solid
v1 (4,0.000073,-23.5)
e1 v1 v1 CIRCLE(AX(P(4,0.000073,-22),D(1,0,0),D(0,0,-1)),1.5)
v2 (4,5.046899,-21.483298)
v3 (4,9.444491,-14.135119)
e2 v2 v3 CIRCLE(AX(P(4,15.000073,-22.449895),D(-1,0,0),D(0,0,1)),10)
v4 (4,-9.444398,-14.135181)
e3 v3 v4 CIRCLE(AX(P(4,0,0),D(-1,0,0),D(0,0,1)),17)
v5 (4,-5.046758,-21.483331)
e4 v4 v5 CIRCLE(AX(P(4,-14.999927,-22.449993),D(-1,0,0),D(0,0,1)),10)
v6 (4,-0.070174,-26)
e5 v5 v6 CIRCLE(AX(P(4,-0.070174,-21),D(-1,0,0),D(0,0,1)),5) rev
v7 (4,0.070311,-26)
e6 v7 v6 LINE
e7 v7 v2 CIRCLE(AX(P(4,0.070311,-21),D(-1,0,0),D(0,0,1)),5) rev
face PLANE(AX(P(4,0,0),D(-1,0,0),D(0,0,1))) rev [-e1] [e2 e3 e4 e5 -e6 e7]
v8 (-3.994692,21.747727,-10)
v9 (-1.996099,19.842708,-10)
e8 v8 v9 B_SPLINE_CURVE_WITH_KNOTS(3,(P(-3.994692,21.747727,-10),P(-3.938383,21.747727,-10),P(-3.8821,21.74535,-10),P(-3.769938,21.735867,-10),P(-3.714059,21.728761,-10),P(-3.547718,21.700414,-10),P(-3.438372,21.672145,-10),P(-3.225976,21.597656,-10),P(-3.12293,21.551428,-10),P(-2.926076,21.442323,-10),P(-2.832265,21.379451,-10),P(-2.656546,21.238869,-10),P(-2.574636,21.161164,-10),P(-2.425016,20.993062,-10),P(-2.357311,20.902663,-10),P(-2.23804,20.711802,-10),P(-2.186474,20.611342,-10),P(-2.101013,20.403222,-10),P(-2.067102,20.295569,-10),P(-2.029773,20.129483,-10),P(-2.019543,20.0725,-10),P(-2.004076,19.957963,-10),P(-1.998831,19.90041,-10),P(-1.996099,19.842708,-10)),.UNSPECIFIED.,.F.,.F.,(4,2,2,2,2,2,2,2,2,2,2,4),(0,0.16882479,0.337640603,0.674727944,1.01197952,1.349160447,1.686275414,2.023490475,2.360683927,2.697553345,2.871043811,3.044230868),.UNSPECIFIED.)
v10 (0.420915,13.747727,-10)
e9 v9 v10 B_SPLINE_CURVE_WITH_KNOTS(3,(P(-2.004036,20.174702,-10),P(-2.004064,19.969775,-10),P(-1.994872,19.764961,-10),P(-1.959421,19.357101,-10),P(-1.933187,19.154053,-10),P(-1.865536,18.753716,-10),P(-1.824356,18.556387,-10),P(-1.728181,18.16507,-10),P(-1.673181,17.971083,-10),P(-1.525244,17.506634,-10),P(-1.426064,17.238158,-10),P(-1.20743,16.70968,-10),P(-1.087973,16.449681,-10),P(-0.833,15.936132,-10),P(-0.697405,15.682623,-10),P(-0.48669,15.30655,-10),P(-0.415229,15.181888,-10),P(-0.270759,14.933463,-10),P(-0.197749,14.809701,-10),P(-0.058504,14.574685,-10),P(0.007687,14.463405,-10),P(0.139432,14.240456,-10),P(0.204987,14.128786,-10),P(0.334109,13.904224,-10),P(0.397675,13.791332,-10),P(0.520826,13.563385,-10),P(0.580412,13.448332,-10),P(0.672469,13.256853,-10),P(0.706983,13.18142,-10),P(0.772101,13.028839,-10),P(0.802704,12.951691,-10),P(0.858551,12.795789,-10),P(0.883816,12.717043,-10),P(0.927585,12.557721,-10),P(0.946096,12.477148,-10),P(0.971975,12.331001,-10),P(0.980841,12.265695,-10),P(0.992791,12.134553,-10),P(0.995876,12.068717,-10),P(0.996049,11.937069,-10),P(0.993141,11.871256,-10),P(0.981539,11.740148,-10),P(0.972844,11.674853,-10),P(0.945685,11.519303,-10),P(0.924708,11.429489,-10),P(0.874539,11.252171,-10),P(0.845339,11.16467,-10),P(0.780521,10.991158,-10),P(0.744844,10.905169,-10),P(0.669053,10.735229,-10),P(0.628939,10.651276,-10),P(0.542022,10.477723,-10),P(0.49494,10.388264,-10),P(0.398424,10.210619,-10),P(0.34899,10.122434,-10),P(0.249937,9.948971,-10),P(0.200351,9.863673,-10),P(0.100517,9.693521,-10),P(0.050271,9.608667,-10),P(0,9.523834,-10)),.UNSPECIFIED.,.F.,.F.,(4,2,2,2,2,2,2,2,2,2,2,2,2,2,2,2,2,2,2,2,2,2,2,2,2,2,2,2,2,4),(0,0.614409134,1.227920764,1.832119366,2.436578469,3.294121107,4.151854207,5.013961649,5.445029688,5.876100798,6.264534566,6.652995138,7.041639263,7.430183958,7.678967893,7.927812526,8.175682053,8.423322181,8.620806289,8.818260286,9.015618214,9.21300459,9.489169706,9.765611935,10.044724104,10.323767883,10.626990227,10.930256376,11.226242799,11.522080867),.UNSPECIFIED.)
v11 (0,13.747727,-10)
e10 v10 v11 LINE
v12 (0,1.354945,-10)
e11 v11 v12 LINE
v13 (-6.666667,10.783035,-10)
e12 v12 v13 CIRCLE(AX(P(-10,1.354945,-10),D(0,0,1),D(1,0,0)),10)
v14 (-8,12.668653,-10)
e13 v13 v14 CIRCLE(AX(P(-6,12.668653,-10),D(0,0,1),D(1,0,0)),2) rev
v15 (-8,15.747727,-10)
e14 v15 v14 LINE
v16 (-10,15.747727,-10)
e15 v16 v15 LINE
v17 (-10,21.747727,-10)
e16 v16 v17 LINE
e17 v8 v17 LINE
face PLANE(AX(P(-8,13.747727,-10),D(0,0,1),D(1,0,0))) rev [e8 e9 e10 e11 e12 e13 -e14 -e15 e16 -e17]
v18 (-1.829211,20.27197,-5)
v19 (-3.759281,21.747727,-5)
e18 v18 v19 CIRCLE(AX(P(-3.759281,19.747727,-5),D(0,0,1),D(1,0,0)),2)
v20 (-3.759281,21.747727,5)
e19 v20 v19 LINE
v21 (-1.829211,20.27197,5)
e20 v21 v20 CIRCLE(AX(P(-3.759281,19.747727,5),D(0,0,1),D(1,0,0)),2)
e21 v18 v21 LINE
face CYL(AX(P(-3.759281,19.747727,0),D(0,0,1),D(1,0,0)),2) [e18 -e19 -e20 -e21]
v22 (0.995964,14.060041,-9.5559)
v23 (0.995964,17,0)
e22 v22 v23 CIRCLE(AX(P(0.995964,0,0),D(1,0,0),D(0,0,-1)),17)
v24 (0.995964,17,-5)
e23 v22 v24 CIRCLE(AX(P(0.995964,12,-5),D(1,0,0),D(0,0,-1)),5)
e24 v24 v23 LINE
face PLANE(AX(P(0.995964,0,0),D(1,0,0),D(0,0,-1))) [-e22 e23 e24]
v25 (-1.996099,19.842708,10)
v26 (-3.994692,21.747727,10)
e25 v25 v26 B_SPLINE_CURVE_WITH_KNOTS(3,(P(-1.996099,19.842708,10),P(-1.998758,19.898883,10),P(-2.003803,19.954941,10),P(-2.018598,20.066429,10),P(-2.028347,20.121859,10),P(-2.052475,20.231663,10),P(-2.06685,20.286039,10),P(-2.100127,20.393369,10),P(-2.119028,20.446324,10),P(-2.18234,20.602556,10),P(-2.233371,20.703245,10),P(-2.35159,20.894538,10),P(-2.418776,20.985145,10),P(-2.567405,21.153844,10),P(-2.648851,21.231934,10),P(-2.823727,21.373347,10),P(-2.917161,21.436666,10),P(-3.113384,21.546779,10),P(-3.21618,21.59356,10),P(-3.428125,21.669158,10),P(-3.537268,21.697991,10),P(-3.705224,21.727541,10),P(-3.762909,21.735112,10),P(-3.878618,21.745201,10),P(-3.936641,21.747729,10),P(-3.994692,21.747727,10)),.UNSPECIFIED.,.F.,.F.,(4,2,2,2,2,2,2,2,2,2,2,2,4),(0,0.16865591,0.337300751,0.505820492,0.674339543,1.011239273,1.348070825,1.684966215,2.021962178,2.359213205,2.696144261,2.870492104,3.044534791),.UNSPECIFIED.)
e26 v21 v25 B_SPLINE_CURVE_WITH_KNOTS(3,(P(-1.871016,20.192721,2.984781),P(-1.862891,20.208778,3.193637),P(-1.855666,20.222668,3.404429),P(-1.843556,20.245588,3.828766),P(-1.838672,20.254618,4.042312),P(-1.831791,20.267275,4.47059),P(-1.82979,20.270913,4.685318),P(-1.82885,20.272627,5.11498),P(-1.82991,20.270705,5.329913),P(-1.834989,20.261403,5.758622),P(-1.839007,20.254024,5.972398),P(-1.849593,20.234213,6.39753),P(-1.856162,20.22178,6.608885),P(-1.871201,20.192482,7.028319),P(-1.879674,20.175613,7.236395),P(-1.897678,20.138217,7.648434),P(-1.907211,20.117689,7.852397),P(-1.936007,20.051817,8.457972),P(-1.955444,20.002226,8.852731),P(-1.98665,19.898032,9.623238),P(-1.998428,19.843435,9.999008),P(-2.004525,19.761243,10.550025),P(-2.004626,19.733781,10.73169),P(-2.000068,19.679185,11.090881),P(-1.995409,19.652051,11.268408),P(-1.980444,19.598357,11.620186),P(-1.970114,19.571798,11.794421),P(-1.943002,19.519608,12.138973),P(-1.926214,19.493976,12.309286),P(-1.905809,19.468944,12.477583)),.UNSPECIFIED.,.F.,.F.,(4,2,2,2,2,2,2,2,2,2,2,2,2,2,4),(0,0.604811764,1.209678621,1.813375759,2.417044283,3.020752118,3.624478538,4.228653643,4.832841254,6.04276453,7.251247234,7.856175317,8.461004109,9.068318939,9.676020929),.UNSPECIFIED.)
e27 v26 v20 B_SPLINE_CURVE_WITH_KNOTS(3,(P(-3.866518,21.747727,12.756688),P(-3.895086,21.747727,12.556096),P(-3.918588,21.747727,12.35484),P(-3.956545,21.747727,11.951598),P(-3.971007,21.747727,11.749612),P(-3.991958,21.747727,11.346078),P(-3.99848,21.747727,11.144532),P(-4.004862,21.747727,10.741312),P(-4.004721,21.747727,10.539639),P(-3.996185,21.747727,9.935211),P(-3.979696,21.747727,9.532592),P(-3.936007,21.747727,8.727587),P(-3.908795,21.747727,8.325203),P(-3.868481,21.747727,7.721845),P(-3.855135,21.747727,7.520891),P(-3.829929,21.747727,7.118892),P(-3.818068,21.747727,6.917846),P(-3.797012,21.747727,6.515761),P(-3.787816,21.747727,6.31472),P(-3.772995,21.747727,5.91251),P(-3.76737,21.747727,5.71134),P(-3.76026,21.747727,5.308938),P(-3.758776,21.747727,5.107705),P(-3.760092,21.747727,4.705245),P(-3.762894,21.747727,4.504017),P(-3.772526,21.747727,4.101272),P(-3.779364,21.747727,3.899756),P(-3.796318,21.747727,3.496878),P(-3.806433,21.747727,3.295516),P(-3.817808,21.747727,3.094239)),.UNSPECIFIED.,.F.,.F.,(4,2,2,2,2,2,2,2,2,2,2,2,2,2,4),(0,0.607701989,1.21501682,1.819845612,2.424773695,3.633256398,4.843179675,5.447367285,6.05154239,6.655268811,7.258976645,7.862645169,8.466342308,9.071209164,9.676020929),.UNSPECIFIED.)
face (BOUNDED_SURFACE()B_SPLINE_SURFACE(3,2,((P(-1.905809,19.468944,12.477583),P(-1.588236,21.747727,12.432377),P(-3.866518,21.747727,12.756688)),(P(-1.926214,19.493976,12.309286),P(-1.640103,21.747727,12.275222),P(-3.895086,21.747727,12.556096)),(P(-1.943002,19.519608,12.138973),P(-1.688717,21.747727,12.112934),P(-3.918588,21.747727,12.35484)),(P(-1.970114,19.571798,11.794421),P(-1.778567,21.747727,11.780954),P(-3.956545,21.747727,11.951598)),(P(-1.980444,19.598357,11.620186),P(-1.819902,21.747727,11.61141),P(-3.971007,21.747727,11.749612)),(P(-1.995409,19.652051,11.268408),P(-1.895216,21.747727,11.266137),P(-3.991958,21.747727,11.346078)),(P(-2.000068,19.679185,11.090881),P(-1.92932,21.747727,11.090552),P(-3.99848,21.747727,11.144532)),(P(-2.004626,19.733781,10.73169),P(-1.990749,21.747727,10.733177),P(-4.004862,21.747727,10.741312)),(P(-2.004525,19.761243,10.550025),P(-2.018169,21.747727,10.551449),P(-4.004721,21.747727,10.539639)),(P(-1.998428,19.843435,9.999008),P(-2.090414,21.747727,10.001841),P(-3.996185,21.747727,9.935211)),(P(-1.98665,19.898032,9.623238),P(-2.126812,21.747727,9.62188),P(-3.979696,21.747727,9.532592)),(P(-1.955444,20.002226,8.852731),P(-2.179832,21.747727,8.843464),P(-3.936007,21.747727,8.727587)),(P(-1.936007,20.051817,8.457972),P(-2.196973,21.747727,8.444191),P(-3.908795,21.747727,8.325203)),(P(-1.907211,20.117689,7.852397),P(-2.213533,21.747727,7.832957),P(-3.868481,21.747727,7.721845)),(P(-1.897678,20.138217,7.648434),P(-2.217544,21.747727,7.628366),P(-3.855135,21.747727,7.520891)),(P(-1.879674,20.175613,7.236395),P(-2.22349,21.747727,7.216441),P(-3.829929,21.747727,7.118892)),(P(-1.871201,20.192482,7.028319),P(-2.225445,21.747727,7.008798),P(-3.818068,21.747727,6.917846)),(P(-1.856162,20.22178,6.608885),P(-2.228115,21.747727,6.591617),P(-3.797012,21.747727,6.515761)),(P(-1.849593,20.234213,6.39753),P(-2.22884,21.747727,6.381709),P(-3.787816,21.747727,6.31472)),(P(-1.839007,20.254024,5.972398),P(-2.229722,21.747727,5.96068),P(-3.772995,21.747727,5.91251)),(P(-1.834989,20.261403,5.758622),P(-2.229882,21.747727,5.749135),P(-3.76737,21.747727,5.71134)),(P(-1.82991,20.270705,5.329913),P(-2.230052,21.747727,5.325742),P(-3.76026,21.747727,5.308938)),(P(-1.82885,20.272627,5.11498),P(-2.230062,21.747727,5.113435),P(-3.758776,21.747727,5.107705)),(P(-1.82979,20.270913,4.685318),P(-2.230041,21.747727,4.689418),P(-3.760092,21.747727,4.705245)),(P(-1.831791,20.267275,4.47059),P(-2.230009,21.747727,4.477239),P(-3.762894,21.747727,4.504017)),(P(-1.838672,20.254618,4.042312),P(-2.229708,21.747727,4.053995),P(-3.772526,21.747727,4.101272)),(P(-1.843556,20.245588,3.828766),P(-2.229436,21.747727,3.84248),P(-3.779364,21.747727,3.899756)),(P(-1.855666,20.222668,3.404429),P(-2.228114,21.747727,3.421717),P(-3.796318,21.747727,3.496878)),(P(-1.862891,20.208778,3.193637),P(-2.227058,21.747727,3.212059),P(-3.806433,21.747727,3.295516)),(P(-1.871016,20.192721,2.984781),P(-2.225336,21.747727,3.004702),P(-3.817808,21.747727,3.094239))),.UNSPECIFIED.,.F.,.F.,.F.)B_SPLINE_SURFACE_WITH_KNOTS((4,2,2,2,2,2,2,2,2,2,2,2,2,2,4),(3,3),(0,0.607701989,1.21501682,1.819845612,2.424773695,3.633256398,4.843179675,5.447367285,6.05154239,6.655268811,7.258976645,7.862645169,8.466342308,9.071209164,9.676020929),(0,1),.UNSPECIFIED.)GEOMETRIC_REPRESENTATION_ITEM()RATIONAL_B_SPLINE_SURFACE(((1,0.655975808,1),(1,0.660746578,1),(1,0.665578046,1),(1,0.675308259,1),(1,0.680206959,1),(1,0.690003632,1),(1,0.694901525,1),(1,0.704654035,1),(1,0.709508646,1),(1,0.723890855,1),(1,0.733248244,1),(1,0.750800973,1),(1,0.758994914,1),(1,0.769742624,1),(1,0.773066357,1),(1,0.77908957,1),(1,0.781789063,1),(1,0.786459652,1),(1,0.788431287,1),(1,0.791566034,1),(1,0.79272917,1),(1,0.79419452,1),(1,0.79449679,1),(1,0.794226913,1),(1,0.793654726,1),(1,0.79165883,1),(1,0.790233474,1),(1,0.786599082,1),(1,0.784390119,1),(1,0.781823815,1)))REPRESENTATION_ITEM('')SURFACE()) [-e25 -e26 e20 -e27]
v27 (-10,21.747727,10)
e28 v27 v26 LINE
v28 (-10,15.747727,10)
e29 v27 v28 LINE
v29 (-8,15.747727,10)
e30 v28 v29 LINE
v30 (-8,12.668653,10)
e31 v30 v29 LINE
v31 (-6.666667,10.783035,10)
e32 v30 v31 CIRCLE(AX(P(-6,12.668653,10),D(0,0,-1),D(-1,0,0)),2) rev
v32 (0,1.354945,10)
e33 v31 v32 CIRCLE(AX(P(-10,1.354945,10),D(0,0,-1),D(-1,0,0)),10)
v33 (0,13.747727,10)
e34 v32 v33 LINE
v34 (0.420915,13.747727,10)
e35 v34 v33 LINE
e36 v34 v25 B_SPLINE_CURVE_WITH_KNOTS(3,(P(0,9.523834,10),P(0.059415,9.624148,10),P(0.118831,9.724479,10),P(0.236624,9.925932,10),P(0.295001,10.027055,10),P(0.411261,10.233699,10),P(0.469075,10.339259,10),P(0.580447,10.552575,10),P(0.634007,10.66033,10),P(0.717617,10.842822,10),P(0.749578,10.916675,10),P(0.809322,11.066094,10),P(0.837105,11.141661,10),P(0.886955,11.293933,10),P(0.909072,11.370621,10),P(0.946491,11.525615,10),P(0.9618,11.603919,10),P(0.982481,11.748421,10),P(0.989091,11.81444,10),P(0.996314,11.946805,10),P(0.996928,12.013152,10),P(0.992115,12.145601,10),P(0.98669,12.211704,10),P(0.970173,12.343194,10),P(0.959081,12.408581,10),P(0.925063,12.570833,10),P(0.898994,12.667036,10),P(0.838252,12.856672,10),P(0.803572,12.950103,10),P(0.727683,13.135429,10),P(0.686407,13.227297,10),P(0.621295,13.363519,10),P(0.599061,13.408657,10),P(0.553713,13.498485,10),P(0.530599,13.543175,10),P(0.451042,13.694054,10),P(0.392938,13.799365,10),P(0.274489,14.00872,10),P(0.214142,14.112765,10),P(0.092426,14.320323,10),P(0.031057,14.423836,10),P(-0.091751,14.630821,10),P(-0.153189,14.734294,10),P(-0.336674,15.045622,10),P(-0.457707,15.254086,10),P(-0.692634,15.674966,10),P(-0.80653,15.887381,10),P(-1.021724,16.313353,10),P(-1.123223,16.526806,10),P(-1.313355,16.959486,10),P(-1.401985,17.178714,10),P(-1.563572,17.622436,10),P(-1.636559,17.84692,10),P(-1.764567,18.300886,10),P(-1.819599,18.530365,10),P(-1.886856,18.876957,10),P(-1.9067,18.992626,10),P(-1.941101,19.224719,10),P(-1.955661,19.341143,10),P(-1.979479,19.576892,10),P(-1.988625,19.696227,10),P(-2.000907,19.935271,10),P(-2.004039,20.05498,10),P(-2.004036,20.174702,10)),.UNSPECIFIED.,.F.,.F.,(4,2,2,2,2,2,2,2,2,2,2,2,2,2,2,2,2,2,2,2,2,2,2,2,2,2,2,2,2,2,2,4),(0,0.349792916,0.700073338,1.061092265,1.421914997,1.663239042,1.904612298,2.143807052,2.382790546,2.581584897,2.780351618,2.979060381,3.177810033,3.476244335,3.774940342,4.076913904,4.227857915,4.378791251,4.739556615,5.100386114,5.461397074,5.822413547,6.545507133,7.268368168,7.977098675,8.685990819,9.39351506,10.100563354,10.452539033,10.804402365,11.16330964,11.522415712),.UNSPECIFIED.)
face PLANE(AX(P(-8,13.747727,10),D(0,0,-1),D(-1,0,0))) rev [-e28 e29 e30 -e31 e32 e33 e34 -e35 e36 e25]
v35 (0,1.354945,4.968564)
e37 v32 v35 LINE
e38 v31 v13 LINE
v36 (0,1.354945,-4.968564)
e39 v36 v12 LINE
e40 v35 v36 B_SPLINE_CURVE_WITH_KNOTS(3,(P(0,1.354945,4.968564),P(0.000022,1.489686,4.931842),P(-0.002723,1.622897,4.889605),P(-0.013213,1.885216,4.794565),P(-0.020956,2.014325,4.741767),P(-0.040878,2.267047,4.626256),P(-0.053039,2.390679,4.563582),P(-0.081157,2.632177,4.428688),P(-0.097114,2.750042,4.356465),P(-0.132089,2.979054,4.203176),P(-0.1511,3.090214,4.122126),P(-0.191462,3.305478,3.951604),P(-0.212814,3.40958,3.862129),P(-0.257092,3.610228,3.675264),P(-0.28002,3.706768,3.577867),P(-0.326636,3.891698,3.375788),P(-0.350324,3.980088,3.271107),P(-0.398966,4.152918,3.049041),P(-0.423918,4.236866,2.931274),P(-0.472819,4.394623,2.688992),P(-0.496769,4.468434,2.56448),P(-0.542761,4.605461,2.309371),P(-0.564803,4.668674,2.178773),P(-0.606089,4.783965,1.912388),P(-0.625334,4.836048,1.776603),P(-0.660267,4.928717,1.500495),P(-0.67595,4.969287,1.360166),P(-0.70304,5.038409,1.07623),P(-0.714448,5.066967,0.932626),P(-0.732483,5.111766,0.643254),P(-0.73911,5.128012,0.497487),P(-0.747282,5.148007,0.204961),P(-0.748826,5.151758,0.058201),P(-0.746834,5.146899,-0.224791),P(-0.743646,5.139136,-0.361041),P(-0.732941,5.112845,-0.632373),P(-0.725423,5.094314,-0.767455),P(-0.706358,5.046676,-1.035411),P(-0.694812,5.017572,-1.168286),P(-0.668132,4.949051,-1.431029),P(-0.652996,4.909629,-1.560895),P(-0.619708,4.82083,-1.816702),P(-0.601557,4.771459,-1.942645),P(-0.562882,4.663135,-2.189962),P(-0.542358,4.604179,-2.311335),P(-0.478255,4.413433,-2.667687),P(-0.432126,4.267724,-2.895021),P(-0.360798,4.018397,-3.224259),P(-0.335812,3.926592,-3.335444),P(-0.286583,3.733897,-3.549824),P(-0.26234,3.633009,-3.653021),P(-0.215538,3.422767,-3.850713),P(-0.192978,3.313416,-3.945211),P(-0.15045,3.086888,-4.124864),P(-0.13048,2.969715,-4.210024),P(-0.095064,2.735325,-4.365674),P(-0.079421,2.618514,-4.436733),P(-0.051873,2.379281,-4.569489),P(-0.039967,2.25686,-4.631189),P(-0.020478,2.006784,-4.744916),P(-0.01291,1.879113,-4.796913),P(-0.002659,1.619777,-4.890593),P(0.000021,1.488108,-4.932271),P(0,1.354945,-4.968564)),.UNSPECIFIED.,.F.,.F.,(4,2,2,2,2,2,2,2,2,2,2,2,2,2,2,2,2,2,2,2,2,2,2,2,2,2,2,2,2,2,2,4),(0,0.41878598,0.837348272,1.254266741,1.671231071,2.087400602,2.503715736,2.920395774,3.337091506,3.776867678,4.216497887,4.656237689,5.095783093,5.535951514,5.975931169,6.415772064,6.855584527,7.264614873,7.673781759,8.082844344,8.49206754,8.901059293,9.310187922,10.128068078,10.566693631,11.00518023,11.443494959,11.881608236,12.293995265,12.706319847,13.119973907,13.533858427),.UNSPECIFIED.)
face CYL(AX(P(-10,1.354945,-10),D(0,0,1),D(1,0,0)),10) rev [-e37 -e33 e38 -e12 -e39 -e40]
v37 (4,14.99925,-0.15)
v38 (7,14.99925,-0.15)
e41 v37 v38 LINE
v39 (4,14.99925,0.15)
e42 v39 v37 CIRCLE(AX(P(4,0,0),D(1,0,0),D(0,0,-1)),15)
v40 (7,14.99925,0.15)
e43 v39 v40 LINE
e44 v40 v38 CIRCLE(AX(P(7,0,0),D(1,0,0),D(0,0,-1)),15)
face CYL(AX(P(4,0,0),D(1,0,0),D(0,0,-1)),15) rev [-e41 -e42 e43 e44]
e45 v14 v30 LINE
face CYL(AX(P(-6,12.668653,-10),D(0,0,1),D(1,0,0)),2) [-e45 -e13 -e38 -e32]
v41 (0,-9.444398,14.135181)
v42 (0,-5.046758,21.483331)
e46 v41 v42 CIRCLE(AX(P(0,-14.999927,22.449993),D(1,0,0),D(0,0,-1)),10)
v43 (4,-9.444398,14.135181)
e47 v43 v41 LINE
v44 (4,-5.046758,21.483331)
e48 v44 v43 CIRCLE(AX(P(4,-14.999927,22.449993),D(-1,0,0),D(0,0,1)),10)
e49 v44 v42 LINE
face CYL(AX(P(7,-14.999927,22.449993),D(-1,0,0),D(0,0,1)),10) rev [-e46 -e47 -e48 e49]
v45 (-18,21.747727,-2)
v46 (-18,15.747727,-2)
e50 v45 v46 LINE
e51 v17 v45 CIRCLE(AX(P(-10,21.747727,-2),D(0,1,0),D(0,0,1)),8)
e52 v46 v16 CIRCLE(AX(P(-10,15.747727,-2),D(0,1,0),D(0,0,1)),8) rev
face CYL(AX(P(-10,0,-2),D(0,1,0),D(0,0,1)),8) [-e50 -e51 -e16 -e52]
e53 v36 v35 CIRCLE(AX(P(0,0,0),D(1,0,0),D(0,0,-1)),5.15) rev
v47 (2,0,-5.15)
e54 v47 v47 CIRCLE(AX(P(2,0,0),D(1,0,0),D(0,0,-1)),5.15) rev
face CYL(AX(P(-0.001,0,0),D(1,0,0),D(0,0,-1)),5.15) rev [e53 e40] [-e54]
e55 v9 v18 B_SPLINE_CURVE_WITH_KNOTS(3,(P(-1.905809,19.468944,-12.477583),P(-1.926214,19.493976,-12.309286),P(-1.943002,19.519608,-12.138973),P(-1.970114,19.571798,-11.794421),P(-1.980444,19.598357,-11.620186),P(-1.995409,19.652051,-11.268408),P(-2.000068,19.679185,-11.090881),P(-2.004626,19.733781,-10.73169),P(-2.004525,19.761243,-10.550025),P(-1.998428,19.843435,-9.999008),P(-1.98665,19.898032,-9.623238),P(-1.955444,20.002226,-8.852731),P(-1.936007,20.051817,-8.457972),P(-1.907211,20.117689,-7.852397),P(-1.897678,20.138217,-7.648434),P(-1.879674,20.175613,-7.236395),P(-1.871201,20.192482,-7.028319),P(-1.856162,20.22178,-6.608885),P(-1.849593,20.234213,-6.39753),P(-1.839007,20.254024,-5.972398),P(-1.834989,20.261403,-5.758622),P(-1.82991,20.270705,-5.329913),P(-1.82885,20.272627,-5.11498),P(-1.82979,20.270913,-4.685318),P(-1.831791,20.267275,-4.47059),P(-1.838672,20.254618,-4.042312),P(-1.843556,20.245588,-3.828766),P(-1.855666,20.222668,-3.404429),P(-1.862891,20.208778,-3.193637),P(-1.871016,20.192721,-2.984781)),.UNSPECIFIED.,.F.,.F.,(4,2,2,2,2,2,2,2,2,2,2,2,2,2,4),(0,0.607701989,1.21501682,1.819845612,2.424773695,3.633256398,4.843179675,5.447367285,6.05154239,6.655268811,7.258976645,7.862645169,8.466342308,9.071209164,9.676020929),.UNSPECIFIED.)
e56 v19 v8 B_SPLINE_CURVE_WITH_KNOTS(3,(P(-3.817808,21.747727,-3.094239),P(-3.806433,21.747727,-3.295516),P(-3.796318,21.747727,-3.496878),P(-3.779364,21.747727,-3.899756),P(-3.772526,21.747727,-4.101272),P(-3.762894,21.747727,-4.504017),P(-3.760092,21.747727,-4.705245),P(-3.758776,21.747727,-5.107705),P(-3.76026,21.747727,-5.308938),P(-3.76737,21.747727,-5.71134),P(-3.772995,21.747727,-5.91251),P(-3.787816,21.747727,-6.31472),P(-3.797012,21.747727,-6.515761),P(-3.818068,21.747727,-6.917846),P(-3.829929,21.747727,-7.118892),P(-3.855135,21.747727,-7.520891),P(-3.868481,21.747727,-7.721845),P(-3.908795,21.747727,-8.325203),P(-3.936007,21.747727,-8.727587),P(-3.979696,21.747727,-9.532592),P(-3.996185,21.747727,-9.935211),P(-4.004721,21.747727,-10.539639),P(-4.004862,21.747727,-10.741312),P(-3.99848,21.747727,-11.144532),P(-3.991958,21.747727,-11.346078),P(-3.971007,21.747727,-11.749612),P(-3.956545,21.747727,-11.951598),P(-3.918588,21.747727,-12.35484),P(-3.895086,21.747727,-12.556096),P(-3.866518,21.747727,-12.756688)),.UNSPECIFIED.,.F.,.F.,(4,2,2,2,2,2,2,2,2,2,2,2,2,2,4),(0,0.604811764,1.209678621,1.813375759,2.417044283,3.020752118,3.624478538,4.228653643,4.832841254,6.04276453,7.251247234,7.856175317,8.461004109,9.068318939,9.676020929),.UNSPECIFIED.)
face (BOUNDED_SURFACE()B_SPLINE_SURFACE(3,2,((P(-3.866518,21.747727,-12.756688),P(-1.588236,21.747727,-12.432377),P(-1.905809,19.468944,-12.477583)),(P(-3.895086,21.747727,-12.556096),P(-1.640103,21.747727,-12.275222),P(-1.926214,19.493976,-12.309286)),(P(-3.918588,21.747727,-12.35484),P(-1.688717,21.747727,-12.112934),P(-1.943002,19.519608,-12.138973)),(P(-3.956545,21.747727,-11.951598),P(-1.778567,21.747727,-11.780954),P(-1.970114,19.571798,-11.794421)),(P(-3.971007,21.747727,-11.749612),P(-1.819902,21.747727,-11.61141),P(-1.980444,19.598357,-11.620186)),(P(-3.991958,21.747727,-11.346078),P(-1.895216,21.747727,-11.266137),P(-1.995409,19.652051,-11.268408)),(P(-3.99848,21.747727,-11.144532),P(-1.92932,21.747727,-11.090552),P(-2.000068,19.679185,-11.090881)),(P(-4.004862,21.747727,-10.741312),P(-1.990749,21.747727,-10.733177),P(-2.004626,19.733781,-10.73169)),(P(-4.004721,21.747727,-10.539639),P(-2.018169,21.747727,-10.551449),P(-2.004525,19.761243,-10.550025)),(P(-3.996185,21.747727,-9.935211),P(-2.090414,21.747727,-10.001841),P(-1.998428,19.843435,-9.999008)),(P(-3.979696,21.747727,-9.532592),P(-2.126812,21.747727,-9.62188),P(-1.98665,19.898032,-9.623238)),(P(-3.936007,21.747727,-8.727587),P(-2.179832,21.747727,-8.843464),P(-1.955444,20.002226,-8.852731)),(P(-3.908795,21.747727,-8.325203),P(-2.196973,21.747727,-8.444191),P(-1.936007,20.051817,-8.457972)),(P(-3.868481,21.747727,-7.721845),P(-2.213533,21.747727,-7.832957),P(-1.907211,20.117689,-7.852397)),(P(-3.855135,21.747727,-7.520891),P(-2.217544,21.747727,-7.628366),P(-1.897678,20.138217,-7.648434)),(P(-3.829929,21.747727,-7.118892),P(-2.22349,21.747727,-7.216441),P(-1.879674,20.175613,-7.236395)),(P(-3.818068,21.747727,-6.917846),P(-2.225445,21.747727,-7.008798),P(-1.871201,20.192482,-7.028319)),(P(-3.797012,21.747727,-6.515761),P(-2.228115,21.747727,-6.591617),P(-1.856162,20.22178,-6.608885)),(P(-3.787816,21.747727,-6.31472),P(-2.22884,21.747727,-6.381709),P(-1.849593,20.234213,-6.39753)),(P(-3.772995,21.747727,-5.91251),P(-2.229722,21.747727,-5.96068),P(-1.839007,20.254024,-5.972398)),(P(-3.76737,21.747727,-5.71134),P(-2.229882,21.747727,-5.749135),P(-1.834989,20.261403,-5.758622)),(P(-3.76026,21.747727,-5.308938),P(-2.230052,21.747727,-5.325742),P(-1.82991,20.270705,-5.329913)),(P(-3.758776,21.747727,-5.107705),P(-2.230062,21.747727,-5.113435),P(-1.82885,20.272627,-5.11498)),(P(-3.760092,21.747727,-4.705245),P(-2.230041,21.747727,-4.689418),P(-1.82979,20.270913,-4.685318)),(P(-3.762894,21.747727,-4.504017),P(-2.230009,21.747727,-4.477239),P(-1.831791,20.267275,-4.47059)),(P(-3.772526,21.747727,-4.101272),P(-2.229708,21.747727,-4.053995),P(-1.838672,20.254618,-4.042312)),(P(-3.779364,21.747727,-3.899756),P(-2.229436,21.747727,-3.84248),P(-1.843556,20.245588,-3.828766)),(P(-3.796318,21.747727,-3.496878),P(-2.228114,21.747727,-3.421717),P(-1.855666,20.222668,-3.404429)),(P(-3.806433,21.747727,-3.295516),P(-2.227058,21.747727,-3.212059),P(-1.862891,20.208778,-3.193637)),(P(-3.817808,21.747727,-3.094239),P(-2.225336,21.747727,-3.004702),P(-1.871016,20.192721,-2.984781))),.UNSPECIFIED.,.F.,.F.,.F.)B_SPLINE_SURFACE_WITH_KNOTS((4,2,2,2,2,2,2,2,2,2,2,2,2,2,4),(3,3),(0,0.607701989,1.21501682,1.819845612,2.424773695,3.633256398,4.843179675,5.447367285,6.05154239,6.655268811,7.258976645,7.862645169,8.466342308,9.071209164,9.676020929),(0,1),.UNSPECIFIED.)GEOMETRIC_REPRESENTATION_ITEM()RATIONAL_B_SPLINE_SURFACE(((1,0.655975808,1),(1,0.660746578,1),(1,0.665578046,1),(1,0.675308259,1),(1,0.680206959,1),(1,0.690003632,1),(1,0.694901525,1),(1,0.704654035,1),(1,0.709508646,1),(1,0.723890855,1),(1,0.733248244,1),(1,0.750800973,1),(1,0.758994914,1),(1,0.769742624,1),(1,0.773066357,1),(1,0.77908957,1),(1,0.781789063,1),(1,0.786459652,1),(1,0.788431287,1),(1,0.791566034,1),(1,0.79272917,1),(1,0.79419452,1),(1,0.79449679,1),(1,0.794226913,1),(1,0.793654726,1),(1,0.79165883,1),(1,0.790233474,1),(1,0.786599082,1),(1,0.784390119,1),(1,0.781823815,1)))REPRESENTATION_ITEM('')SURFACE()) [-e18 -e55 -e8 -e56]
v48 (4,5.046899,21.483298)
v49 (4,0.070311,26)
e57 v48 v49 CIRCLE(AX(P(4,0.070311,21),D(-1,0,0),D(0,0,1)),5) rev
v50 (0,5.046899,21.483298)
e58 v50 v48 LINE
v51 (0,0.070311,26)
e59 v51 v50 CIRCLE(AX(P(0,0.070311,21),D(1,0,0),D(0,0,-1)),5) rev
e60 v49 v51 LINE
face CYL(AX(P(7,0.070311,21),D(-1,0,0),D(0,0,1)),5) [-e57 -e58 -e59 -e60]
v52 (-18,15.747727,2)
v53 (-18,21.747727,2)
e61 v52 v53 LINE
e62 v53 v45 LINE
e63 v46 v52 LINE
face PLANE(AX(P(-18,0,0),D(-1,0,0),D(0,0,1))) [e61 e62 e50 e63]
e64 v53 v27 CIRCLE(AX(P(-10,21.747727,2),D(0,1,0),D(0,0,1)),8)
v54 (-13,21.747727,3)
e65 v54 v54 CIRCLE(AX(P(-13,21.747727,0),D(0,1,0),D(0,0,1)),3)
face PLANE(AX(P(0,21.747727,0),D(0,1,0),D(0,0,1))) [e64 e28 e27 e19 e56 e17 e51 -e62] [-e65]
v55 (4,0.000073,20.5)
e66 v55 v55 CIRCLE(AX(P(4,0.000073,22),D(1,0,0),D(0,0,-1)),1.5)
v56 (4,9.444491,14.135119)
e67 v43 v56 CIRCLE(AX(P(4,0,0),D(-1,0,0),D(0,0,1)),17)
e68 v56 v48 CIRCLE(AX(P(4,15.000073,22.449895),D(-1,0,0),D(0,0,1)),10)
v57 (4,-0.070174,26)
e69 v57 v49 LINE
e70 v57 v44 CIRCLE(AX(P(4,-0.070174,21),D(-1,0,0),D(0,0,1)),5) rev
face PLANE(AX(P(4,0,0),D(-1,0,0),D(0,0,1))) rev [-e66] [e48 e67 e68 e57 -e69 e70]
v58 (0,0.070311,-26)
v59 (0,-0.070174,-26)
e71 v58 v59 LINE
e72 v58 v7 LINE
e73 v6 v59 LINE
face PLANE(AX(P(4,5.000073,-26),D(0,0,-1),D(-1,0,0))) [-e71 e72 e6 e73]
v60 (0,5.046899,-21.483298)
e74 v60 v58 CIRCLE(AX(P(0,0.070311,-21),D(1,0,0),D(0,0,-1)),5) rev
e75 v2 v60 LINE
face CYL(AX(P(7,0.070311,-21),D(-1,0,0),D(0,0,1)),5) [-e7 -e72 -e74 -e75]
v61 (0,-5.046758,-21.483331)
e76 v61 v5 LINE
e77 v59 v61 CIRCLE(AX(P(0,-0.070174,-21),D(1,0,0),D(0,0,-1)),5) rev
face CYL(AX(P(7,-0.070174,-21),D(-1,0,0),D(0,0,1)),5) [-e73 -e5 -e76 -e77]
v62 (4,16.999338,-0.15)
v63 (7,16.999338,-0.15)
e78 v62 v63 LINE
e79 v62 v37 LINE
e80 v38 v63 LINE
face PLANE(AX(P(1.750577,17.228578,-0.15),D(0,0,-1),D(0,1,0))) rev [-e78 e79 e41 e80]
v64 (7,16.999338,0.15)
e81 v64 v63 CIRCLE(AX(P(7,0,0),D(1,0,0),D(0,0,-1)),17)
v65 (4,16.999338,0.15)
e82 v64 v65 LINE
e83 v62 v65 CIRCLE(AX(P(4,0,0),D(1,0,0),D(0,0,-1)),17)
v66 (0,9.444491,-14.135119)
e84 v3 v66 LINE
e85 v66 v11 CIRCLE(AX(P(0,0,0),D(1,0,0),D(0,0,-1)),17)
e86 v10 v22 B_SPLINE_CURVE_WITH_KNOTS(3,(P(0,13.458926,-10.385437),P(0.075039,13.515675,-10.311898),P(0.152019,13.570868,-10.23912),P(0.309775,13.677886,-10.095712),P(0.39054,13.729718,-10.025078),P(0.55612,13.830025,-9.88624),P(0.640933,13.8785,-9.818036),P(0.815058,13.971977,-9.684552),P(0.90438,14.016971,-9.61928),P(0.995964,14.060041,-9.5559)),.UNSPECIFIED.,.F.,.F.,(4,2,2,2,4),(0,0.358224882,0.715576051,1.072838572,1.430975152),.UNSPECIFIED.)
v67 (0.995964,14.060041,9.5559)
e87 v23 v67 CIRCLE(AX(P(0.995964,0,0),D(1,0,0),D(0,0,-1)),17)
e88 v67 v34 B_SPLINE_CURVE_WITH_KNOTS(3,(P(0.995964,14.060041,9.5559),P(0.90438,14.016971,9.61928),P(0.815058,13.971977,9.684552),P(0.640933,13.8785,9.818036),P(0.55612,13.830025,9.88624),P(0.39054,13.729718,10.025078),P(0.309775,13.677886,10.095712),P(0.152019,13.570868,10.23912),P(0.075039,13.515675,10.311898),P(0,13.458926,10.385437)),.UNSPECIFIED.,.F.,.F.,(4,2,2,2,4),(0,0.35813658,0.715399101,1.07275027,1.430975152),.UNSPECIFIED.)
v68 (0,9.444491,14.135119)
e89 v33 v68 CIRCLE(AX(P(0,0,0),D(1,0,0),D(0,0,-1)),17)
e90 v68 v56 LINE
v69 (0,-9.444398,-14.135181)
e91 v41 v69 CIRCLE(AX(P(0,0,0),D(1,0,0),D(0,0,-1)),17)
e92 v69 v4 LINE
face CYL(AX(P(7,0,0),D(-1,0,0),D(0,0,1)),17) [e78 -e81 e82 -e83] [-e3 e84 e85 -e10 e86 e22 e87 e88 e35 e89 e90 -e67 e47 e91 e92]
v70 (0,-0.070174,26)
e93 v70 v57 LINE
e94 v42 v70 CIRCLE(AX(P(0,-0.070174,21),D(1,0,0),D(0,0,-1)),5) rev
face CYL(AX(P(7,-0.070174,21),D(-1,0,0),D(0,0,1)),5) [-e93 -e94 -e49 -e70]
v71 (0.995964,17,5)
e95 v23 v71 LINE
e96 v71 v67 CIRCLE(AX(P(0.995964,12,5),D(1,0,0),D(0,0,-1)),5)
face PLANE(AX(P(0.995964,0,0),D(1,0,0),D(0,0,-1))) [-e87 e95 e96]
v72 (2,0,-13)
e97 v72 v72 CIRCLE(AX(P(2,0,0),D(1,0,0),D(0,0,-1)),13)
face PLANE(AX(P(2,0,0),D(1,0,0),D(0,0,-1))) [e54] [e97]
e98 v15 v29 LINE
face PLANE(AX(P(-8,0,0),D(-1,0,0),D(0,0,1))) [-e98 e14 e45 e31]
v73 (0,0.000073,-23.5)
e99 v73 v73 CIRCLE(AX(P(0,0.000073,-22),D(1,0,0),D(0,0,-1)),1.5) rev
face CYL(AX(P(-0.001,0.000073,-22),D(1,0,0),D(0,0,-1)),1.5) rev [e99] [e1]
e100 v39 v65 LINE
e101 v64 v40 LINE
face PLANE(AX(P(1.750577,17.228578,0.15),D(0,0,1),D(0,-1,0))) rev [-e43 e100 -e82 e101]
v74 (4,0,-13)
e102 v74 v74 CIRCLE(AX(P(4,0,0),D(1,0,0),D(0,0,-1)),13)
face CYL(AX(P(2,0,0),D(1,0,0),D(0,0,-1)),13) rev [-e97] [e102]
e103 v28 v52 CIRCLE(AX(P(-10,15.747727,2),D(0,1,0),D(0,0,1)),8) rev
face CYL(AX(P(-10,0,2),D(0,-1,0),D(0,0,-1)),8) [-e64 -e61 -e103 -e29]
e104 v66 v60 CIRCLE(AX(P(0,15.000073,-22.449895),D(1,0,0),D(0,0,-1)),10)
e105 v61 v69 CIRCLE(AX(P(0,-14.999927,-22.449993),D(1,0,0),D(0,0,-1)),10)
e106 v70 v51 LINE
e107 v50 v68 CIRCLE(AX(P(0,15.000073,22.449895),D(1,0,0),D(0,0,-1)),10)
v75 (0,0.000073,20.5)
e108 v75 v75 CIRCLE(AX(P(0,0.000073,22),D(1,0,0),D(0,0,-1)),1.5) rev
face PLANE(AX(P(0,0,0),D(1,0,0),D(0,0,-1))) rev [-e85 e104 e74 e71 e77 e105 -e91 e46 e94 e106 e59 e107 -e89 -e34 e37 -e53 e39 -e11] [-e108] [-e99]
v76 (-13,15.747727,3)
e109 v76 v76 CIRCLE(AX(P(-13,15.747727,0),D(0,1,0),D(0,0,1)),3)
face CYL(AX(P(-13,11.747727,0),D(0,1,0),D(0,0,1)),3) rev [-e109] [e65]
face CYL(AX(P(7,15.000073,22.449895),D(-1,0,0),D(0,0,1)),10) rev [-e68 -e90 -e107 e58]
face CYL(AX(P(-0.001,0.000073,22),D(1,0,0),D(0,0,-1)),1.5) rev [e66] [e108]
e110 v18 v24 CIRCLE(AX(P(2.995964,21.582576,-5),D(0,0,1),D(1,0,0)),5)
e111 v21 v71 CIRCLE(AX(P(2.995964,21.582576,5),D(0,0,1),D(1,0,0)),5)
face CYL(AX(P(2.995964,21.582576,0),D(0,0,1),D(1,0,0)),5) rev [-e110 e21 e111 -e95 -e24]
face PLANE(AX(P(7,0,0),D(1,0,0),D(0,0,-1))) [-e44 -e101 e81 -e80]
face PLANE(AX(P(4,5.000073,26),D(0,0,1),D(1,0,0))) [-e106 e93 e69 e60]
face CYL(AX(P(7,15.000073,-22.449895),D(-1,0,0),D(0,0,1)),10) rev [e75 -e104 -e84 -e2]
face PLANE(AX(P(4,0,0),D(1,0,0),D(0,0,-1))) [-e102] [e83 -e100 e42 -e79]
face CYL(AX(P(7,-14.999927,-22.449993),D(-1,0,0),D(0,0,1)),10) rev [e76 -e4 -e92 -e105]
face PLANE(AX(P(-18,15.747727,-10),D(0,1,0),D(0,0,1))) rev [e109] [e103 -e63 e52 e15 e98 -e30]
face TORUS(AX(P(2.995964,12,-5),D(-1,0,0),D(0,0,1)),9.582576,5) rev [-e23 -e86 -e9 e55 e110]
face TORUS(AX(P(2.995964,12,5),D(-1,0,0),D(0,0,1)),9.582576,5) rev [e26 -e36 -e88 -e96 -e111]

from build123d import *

# Parameters (mm, degrees)
SKETCH_1_R          = 17
EXTRUDE_1_DEPTH     = 7
EXTRUDE_2_DEPTH     = 4
SKETCH_2_R          = 15
CUT_EXTRUDE_1_DEPTH = 3
CUT_EXTRUDE_2_REACH = 33.321
SKETCH_3_R          = 5.15
SKETCH_4_R          = 13
CUT_EXTRUDE_3_DEPTH = 2
CUT_EXTRUDE_4_REACH = 33.321
SKETCH_6_R          = 1.5
FILLET_1_R          = 10
FILLET_2_R          = 5
SKETCH_8_W          = 0.3
SKETCH_8_H          = 2.22932804
CUT_EXTRUDE_5_DEPTH = 3
SKETCH_9_W          = 20
SKETCH_9_H          = 2.594823192
EXTRUDE_3_DEPTH     = 8
SKETCH_10_W         = 5.99596414
SKETCH_10_H         = 20
EXTRUDE_4_DEPTH     = 8
SKETCH_11_W         = 20
SKETCH_11_H         = 6
EXTRUDE_5_DEPTH     = 10
SKETCH_12_R         = 3
CUT_EXTRUDE_6_DEPTH = 10
FILLET_3_R          = 10
EXTRUDE_6_DEPTH     = 3
FILLET_5_R          = 5
FILLET_6_R          = 5
FILLET_7_R          = 8
FILLET_9_R          = 2


with BuildPart() as part:
    # 草图1 → 凸台-拉伸1 (new body)
    with BuildSketch(Plane(origin=(0, 0, 0), x_dir=(0, 0, -1), z_dir=(1, 0, 0))):
        Circle(SKETCH_1_R)
    extrude(amount=EXTRUDE_1_DEPTH)

    # 草图5 → 凸台-拉伸2 (add)
    with BuildSketch(Plane.ZY):
        Polygon((0, 5.000073493), (26, 5.000073493), (26, -4.999926507), (11, -4.999926507), (-26, -4.999926507), (-26, 5.000073493), align=None)
    extrude(amount=-EXTRUDE_2_DEPTH)

    # 草图2 → 切除-拉伸1 (cut)
    with BuildSketch(Plane(origin=(7, 0, 0), x_dir=(0, 0, -1), z_dir=(1, 0, 0))):
        Circle(SKETCH_2_R)
    extrude(amount=-CUT_EXTRUDE_1_DEPTH, mode=Mode.SUBTRACT)

    # 草图3 → 切除-拉伸2 (cut, up to next)
    with BuildSketch(Plane(origin=(4, 0, 0), x_dir=(0, 0, -1), z_dir=(1, 0, 0)), mode=Mode.PRIVATE) as cut_extrude_2_sk1:
        Circle(SKETCH_3_R)
    cut_extrude_2_tool1 = extrude(cut_extrude_2_sk1.sketch, amount=-CUT_EXTRUDE_2_REACH, mode=Mode.PRIVATE) & part.part
    add(cut_extrude_2_tool1.solids().sort_by_distance((4, 0, 0))[0], mode=Mode.SUBTRACT)

    # 草图4 → 切除-拉伸3 (cut)
    with BuildSketch(Plane(origin=(4, 0, 0), x_dir=(0, 0, -1), z_dir=(1, 0, 0))):
        Circle(SKETCH_4_R)
    extrude(amount=-CUT_EXTRUDE_3_DEPTH, mode=Mode.SUBTRACT)

    # 草图6 → 切除-拉伸4 (cut, up to next)
    with BuildSketch(Plane(origin=(4, 0, 0), x_dir=(0, 0, -1), z_dir=(1, 0, 0)), mode=Mode.PRIVATE) as cut_extrude_4_sk1:
        with Locations((-22, 7.3493e-05)):
            Circle(SKETCH_6_R)
    cut_extrude_4_tool1 = extrude(cut_extrude_4_sk1.sketch, amount=-CUT_EXTRUDE_4_REACH, mode=Mode.PRIVATE) & part.part
    # 草图6 → 切除-拉伸4 (cut, up to next)
    with BuildSketch(Plane(origin=(4, 0, 0), x_dir=(0, 0, -1), z_dir=(1, 0, 0)), mode=Mode.PRIVATE) as cut_extrude_4_sk2:
        with Locations((22, 7.3493e-05)):
            Circle(SKETCH_6_R)
    cut_extrude_4_tool2 = extrude(cut_extrude_4_sk2.sketch, amount=-CUT_EXTRUDE_4_REACH, mode=Mode.PRIVATE) & part.part
    add(cut_extrude_4_tool1.solids().sort_by_distance((4, 7.3e-05, 22))[0], mode=Mode.SUBTRACT)
    add(cut_extrude_4_tool2.solids().sort_by_distance((4, 7.3e-05, -22))[0], mode=Mode.SUBTRACT)

    # 圆角1
    fillet_1_edges = [part.edges().sort_by_distance(p)[0] for p in [
        (2, 5.000073493, -16.248054193),
        (2, 5.000073493, 16.248054193),
        (2, -4.999926507, 16.248099425),
        (2, -4.999926507, -16.248099425),
    ]]
    fillet(fillet_1_edges, radius=FILLET_1_R)

    # 圆角2
    fillet_2_edges = [part.edges().sort_by_distance(p)[0] for p in [
        (2, 5.000073493, 26),
        (2, -4.999926507, 26),
        (2, -4.999926507, -26),
        (2, 5.000073493, -26),
    ]]
    fillet(fillet_2_edges, radius=FILLET_2_R)

    # 草图8 → 切除-拉伸5 (cut)
    with BuildSketch(Plane(origin=(7, 0, 0), x_dir=(0, 0, -1), z_dir=(1, 0, 0))):
        with Locations((0, 16.113914001)):
            Rectangle(SKETCH_8_W, SKETCH_8_H)
    extrude(amount=-CUT_EXTRUDE_5_DEPTH, mode=Mode.SUBTRACT)

    # 草图9 → 凸台-拉伸3 (add)
    with BuildSketch(Plane.ZY):
        with Locations((0, 12.450315489)):
            Rectangle(SKETCH_9_W, SKETCH_9_H)
    extrude(amount=EXTRUDE_3_DEPTH)

    # 草图10 → 凸台-拉伸4 (add)
    with BuildSketch(Plane(origin=(0, 13.747727085, 0), x_dir=(1, 0, 0), z_dir=(0, 1, 0))):
        with Locations((-5.00201793, 0)):
            Rectangle(SKETCH_10_W, SKETCH_10_H)
    extrude(amount=EXTRUDE_4_DEPTH)

    # 草图11 → 凸台-拉伸5 (add)
    with BuildSketch(Plane.ZY.offset(8)):
        with Locations((0, 18.747727085)):
            Rectangle(SKETCH_11_W, SKETCH_11_H)
    extrude(amount=EXTRUDE_5_DEPTH)

    # 草图12 → 切除-拉伸6 (cut)
    with BuildSketch(Plane(origin=(0, 21.747727085, 0), x_dir=(1, 0, 0), z_dir=(0, 1, 0))):
        with Locations(Location((-13, 0, 0), (0, 0, 270))):
            Circle(SKETCH_12_R)
    extrude(amount=-CUT_EXTRUDE_6_DEPTH, mode=Mode.SUBTRACT)

    # 圆角3
    # the kernel refuses this fillet: 10 mm, written as the material it adds along each edge
    with BuildSketch(Plane(origin=(0, 11.152903893, 10), x_dir=(0, -1, 0), z_dir=(0, 0, -1))) as fillet_3_piece_1_section:
        with BuildLine():
            CenterArc((9.797958971, 10), FILLET_3_R, 191.536959033, 78.463040967)
            Line((0, 8), (0, 0))
            Line((0, 0), (9.797958971, 0))
        make_face()
    fillet_3_piece_1 = extrude(amount=20, mode=Mode.PRIVATE)
    fillet_3_piece_1 = fillet_3_piece_1 - Plane(origin=(0, 0, 0), x_dir=(0, 0, -1), z_dir=(1, 0, 0)) * Cylinder(5.15, 80, mode=Mode.PRIVATE)
    add(fillet_3_piece_1)

    # 草图13 → 凸台-拉伸6 (add)
    with BuildSketch(Plane(origin=(-2.00403586, 0, 0), x_dir=(0, 0, -1), z_dir=(1, 0, 0))):
        Polygon((0, 17), (10, 17), (10, 13.747727085), (-10, 13.747727085), (-10, 17), align=None)
    extrude(amount=EXTRUDE_6_DEPTH)

    # 圆角5
    # the kernel refuses this fillet: 5 mm, written as the material it takes off along each edge
    with BuildSketch(Plane(origin=(-2.00403586, 17, -10), x_dir=(0, -1, 0), z_dir=(1, 0, 0))) as fillet_5_piece_1_section:
        with BuildLine():
            CenterArc((FILLET_5_R, -FILLET_5_R), FILLET_5_R, 90, 90)
            Line((0, -FILLET_5_R), (0, 0))
            Line((0, 0), (FILLET_5_R, 0))
        make_face()
    fillet_5_piece_1 = extrude(amount=15.5, mode=Mode.PRIVATE)
    fillet_5_piece_1 = split(fillet_5_piece_1, bisect_by=Plane(origin=(0, 17, -10), z_dir=(-1, 0, 0)), keep=Keep.TOP, mode=Mode.PRIVATE)
    add(fillet_5_piece_1, mode=Mode.SUBTRACT)
    with BuildSketch(Plane(origin=(-2.00403586, 17, -10), x_dir=(0, -1, 0), z_dir=(1, 0, 0))) as fillet_5_piece_2_section:
        with BuildLine():
            CenterArc((FILLET_5_R, -FILLET_5_R), FILLET_5_R, 90, 90)
            Line((0, -FILLET_5_R), (0, 0))
            Line((0, 0), (FILLET_5_R, 0))
        make_face()
    fillet_5_piece_2 = extrude(amount=15.5, mode=Mode.PRIVATE)
    fillet_5_piece_2 = fillet_5_piece_2 - Plane(origin=(-2.00403586, 0, 0), x_dir=(0, 0, -1), z_dir=(-1, 0, 0)) * Cylinder(17, 51, mode=Mode.PRIVATE)
    add(fillet_5_piece_2, mode=Mode.SUBTRACT)
    with BuildSketch(Plane(origin=(-2.00403586, 17, 10), x_dir=(0, -1, 0), z_dir=(1, 0, 0))) as fillet_5_piece_3_section:
        with BuildLine():
            CenterArc((FILLET_5_R, FILLET_5_R), FILLET_5_R, 180, 90)
            Line((0, FILLET_5_R), (0, 0))
            Line((0, 0), (FILLET_5_R, 0))
        make_face()
    fillet_5_piece_3 = extrude(amount=15.5, mode=Mode.PRIVATE)
    fillet_5_piece_3 = split(fillet_5_piece_3, bisect_by=Plane(origin=(0, 17, 10), z_dir=(-1, 0, 0)), keep=Keep.TOP, mode=Mode.PRIVATE)
    add(fillet_5_piece_3, mode=Mode.SUBTRACT)
    with BuildSketch(Plane(origin=(-2.00403586, 17, 10), x_dir=(0, -1, 0), z_dir=(1, 0, 0))) as fillet_5_piece_4_section:
        with BuildLine():
            CenterArc((FILLET_5_R, FILLET_5_R), FILLET_5_R, 180, 90)
            Line((0, FILLET_5_R), (0, 0))
            Line((0, 0), (FILLET_5_R, 0))
        make_face()
    fillet_5_piece_4 = extrude(amount=15.5, mode=Mode.PRIVATE)
    fillet_5_piece_4 = fillet_5_piece_4 - Plane(origin=(-2.00403586, 0, 0), x_dir=(0, 0, -1), z_dir=(-1, 0, 0)) * Cylinder(17, 51, mode=Mode.PRIVATE)
    add(fillet_5_piece_4, mode=Mode.SUBTRACT)

    # 圆角6
    # the kernel refuses this fillet: 5 mm, written as the material it adds along each edge
    with BuildSketch(Plane(origin=(-2.00403586, 12, -5), x_dir=(0, 1, 0), z_dir=(0, 0, 1))) as fillet_6_piece_1_section:
        with BuildLine():
            CenterArc((9.582575695, -5), FILLET_6_R, 90, 66.421821522)
            Line((5, -3), (5, 0))
            Line((5, 0), (9.582575695, 0))
        make_face()
    fillet_6_piece_1 = revolve(axis=Axis((-2.00403586, 12, -5), (-1, 0, 0)), revolution_arc=221.333860008, mode=Mode.PRIVATE)
    fillet_6_piece_1 = fillet_6_piece_1 - Plane(origin=(-10, 1.354944922, -5), x_dir=(0, -1, 0), z_dir=(0, 0, 1)) * Cylinder(10, 39, mode=Mode.PRIVATE)
    fillet_6_piece_1 = split(fillet_6_piece_1, bisect_by=Plane(origin=(-2.00403586, 12, -10), z_dir=(0, 0, 1)), keep=Keep.TOP, mode=Mode.PRIVATE)
    add(fillet_6_piece_1)
    with BuildSketch(Plane(origin=(-2.00403586, 12, 5), x_dir=(0, 1, 0), z_dir=(0, 0, -1))) as fillet_6_piece_2_section:
        with BuildLine():
            CenterArc((9.582575695, 5), FILLET_6_R, 203.578178478, 66.421821522)
            Line((5, 3), (5, 0))
            Line((5, 0), (9.582575695, 0))
        make_face()
    fillet_6_piece_2 = revolve(axis=Axis((-2.00403586, 12, 5), (1, 0, 0)), revolution_arc=221.333860008, mode=Mode.PRIVATE)
    fillet_6_piece_2 = fillet_6_piece_2 - Plane(origin=(-10, 1.354944922, 5), x_dir=(0, -1, 0), z_dir=(0, 0, 1)) * Cylinder(10, 39, mode=Mode.PRIVATE)
    fillet_6_piece_2 = split(fillet_6_piece_2, bisect_by=Plane(origin=(-2.00403586, 12, 10), z_dir=(0, 0, -1)), keep=Keep.TOP, mode=Mode.PRIVATE)
    add(fillet_6_piece_2)
    with BuildSketch(Plane(origin=(-2.00403586, 17, -5), x_dir=(0, 1, 0), z_dir=(0, 0, 1))) as fillet_6_piece_3:
        with BuildLine():
            CenterArc((4.582575695, -5), FILLET_6_R, 90, 66.421821522)
            Line((0, -3), (0, 0))
            Line((0, 0), (4.582575695, 0))
        make_face()
    extrude(amount=10)

    # 圆角7
    fillet_7_edges = [part.edges().sort_by_distance(p)[0] for p in [
        (-18, 18.747727085, -10),
        (-18, 18.747727085, 10),
    ]]
    fillet(fillet_7_edges, radius=FILLET_7_R)

    # 圆角9
    fillet_9_edges = [part.edges().sort_by_distance(p)[0] for p in [
        (-2.00403586, 21.747727085, 0),
        (-8, 11.152903893, 0),
    ]]
    fillet(fillet_9_edges, radius=FILLET_9_R)


solid = part.part
